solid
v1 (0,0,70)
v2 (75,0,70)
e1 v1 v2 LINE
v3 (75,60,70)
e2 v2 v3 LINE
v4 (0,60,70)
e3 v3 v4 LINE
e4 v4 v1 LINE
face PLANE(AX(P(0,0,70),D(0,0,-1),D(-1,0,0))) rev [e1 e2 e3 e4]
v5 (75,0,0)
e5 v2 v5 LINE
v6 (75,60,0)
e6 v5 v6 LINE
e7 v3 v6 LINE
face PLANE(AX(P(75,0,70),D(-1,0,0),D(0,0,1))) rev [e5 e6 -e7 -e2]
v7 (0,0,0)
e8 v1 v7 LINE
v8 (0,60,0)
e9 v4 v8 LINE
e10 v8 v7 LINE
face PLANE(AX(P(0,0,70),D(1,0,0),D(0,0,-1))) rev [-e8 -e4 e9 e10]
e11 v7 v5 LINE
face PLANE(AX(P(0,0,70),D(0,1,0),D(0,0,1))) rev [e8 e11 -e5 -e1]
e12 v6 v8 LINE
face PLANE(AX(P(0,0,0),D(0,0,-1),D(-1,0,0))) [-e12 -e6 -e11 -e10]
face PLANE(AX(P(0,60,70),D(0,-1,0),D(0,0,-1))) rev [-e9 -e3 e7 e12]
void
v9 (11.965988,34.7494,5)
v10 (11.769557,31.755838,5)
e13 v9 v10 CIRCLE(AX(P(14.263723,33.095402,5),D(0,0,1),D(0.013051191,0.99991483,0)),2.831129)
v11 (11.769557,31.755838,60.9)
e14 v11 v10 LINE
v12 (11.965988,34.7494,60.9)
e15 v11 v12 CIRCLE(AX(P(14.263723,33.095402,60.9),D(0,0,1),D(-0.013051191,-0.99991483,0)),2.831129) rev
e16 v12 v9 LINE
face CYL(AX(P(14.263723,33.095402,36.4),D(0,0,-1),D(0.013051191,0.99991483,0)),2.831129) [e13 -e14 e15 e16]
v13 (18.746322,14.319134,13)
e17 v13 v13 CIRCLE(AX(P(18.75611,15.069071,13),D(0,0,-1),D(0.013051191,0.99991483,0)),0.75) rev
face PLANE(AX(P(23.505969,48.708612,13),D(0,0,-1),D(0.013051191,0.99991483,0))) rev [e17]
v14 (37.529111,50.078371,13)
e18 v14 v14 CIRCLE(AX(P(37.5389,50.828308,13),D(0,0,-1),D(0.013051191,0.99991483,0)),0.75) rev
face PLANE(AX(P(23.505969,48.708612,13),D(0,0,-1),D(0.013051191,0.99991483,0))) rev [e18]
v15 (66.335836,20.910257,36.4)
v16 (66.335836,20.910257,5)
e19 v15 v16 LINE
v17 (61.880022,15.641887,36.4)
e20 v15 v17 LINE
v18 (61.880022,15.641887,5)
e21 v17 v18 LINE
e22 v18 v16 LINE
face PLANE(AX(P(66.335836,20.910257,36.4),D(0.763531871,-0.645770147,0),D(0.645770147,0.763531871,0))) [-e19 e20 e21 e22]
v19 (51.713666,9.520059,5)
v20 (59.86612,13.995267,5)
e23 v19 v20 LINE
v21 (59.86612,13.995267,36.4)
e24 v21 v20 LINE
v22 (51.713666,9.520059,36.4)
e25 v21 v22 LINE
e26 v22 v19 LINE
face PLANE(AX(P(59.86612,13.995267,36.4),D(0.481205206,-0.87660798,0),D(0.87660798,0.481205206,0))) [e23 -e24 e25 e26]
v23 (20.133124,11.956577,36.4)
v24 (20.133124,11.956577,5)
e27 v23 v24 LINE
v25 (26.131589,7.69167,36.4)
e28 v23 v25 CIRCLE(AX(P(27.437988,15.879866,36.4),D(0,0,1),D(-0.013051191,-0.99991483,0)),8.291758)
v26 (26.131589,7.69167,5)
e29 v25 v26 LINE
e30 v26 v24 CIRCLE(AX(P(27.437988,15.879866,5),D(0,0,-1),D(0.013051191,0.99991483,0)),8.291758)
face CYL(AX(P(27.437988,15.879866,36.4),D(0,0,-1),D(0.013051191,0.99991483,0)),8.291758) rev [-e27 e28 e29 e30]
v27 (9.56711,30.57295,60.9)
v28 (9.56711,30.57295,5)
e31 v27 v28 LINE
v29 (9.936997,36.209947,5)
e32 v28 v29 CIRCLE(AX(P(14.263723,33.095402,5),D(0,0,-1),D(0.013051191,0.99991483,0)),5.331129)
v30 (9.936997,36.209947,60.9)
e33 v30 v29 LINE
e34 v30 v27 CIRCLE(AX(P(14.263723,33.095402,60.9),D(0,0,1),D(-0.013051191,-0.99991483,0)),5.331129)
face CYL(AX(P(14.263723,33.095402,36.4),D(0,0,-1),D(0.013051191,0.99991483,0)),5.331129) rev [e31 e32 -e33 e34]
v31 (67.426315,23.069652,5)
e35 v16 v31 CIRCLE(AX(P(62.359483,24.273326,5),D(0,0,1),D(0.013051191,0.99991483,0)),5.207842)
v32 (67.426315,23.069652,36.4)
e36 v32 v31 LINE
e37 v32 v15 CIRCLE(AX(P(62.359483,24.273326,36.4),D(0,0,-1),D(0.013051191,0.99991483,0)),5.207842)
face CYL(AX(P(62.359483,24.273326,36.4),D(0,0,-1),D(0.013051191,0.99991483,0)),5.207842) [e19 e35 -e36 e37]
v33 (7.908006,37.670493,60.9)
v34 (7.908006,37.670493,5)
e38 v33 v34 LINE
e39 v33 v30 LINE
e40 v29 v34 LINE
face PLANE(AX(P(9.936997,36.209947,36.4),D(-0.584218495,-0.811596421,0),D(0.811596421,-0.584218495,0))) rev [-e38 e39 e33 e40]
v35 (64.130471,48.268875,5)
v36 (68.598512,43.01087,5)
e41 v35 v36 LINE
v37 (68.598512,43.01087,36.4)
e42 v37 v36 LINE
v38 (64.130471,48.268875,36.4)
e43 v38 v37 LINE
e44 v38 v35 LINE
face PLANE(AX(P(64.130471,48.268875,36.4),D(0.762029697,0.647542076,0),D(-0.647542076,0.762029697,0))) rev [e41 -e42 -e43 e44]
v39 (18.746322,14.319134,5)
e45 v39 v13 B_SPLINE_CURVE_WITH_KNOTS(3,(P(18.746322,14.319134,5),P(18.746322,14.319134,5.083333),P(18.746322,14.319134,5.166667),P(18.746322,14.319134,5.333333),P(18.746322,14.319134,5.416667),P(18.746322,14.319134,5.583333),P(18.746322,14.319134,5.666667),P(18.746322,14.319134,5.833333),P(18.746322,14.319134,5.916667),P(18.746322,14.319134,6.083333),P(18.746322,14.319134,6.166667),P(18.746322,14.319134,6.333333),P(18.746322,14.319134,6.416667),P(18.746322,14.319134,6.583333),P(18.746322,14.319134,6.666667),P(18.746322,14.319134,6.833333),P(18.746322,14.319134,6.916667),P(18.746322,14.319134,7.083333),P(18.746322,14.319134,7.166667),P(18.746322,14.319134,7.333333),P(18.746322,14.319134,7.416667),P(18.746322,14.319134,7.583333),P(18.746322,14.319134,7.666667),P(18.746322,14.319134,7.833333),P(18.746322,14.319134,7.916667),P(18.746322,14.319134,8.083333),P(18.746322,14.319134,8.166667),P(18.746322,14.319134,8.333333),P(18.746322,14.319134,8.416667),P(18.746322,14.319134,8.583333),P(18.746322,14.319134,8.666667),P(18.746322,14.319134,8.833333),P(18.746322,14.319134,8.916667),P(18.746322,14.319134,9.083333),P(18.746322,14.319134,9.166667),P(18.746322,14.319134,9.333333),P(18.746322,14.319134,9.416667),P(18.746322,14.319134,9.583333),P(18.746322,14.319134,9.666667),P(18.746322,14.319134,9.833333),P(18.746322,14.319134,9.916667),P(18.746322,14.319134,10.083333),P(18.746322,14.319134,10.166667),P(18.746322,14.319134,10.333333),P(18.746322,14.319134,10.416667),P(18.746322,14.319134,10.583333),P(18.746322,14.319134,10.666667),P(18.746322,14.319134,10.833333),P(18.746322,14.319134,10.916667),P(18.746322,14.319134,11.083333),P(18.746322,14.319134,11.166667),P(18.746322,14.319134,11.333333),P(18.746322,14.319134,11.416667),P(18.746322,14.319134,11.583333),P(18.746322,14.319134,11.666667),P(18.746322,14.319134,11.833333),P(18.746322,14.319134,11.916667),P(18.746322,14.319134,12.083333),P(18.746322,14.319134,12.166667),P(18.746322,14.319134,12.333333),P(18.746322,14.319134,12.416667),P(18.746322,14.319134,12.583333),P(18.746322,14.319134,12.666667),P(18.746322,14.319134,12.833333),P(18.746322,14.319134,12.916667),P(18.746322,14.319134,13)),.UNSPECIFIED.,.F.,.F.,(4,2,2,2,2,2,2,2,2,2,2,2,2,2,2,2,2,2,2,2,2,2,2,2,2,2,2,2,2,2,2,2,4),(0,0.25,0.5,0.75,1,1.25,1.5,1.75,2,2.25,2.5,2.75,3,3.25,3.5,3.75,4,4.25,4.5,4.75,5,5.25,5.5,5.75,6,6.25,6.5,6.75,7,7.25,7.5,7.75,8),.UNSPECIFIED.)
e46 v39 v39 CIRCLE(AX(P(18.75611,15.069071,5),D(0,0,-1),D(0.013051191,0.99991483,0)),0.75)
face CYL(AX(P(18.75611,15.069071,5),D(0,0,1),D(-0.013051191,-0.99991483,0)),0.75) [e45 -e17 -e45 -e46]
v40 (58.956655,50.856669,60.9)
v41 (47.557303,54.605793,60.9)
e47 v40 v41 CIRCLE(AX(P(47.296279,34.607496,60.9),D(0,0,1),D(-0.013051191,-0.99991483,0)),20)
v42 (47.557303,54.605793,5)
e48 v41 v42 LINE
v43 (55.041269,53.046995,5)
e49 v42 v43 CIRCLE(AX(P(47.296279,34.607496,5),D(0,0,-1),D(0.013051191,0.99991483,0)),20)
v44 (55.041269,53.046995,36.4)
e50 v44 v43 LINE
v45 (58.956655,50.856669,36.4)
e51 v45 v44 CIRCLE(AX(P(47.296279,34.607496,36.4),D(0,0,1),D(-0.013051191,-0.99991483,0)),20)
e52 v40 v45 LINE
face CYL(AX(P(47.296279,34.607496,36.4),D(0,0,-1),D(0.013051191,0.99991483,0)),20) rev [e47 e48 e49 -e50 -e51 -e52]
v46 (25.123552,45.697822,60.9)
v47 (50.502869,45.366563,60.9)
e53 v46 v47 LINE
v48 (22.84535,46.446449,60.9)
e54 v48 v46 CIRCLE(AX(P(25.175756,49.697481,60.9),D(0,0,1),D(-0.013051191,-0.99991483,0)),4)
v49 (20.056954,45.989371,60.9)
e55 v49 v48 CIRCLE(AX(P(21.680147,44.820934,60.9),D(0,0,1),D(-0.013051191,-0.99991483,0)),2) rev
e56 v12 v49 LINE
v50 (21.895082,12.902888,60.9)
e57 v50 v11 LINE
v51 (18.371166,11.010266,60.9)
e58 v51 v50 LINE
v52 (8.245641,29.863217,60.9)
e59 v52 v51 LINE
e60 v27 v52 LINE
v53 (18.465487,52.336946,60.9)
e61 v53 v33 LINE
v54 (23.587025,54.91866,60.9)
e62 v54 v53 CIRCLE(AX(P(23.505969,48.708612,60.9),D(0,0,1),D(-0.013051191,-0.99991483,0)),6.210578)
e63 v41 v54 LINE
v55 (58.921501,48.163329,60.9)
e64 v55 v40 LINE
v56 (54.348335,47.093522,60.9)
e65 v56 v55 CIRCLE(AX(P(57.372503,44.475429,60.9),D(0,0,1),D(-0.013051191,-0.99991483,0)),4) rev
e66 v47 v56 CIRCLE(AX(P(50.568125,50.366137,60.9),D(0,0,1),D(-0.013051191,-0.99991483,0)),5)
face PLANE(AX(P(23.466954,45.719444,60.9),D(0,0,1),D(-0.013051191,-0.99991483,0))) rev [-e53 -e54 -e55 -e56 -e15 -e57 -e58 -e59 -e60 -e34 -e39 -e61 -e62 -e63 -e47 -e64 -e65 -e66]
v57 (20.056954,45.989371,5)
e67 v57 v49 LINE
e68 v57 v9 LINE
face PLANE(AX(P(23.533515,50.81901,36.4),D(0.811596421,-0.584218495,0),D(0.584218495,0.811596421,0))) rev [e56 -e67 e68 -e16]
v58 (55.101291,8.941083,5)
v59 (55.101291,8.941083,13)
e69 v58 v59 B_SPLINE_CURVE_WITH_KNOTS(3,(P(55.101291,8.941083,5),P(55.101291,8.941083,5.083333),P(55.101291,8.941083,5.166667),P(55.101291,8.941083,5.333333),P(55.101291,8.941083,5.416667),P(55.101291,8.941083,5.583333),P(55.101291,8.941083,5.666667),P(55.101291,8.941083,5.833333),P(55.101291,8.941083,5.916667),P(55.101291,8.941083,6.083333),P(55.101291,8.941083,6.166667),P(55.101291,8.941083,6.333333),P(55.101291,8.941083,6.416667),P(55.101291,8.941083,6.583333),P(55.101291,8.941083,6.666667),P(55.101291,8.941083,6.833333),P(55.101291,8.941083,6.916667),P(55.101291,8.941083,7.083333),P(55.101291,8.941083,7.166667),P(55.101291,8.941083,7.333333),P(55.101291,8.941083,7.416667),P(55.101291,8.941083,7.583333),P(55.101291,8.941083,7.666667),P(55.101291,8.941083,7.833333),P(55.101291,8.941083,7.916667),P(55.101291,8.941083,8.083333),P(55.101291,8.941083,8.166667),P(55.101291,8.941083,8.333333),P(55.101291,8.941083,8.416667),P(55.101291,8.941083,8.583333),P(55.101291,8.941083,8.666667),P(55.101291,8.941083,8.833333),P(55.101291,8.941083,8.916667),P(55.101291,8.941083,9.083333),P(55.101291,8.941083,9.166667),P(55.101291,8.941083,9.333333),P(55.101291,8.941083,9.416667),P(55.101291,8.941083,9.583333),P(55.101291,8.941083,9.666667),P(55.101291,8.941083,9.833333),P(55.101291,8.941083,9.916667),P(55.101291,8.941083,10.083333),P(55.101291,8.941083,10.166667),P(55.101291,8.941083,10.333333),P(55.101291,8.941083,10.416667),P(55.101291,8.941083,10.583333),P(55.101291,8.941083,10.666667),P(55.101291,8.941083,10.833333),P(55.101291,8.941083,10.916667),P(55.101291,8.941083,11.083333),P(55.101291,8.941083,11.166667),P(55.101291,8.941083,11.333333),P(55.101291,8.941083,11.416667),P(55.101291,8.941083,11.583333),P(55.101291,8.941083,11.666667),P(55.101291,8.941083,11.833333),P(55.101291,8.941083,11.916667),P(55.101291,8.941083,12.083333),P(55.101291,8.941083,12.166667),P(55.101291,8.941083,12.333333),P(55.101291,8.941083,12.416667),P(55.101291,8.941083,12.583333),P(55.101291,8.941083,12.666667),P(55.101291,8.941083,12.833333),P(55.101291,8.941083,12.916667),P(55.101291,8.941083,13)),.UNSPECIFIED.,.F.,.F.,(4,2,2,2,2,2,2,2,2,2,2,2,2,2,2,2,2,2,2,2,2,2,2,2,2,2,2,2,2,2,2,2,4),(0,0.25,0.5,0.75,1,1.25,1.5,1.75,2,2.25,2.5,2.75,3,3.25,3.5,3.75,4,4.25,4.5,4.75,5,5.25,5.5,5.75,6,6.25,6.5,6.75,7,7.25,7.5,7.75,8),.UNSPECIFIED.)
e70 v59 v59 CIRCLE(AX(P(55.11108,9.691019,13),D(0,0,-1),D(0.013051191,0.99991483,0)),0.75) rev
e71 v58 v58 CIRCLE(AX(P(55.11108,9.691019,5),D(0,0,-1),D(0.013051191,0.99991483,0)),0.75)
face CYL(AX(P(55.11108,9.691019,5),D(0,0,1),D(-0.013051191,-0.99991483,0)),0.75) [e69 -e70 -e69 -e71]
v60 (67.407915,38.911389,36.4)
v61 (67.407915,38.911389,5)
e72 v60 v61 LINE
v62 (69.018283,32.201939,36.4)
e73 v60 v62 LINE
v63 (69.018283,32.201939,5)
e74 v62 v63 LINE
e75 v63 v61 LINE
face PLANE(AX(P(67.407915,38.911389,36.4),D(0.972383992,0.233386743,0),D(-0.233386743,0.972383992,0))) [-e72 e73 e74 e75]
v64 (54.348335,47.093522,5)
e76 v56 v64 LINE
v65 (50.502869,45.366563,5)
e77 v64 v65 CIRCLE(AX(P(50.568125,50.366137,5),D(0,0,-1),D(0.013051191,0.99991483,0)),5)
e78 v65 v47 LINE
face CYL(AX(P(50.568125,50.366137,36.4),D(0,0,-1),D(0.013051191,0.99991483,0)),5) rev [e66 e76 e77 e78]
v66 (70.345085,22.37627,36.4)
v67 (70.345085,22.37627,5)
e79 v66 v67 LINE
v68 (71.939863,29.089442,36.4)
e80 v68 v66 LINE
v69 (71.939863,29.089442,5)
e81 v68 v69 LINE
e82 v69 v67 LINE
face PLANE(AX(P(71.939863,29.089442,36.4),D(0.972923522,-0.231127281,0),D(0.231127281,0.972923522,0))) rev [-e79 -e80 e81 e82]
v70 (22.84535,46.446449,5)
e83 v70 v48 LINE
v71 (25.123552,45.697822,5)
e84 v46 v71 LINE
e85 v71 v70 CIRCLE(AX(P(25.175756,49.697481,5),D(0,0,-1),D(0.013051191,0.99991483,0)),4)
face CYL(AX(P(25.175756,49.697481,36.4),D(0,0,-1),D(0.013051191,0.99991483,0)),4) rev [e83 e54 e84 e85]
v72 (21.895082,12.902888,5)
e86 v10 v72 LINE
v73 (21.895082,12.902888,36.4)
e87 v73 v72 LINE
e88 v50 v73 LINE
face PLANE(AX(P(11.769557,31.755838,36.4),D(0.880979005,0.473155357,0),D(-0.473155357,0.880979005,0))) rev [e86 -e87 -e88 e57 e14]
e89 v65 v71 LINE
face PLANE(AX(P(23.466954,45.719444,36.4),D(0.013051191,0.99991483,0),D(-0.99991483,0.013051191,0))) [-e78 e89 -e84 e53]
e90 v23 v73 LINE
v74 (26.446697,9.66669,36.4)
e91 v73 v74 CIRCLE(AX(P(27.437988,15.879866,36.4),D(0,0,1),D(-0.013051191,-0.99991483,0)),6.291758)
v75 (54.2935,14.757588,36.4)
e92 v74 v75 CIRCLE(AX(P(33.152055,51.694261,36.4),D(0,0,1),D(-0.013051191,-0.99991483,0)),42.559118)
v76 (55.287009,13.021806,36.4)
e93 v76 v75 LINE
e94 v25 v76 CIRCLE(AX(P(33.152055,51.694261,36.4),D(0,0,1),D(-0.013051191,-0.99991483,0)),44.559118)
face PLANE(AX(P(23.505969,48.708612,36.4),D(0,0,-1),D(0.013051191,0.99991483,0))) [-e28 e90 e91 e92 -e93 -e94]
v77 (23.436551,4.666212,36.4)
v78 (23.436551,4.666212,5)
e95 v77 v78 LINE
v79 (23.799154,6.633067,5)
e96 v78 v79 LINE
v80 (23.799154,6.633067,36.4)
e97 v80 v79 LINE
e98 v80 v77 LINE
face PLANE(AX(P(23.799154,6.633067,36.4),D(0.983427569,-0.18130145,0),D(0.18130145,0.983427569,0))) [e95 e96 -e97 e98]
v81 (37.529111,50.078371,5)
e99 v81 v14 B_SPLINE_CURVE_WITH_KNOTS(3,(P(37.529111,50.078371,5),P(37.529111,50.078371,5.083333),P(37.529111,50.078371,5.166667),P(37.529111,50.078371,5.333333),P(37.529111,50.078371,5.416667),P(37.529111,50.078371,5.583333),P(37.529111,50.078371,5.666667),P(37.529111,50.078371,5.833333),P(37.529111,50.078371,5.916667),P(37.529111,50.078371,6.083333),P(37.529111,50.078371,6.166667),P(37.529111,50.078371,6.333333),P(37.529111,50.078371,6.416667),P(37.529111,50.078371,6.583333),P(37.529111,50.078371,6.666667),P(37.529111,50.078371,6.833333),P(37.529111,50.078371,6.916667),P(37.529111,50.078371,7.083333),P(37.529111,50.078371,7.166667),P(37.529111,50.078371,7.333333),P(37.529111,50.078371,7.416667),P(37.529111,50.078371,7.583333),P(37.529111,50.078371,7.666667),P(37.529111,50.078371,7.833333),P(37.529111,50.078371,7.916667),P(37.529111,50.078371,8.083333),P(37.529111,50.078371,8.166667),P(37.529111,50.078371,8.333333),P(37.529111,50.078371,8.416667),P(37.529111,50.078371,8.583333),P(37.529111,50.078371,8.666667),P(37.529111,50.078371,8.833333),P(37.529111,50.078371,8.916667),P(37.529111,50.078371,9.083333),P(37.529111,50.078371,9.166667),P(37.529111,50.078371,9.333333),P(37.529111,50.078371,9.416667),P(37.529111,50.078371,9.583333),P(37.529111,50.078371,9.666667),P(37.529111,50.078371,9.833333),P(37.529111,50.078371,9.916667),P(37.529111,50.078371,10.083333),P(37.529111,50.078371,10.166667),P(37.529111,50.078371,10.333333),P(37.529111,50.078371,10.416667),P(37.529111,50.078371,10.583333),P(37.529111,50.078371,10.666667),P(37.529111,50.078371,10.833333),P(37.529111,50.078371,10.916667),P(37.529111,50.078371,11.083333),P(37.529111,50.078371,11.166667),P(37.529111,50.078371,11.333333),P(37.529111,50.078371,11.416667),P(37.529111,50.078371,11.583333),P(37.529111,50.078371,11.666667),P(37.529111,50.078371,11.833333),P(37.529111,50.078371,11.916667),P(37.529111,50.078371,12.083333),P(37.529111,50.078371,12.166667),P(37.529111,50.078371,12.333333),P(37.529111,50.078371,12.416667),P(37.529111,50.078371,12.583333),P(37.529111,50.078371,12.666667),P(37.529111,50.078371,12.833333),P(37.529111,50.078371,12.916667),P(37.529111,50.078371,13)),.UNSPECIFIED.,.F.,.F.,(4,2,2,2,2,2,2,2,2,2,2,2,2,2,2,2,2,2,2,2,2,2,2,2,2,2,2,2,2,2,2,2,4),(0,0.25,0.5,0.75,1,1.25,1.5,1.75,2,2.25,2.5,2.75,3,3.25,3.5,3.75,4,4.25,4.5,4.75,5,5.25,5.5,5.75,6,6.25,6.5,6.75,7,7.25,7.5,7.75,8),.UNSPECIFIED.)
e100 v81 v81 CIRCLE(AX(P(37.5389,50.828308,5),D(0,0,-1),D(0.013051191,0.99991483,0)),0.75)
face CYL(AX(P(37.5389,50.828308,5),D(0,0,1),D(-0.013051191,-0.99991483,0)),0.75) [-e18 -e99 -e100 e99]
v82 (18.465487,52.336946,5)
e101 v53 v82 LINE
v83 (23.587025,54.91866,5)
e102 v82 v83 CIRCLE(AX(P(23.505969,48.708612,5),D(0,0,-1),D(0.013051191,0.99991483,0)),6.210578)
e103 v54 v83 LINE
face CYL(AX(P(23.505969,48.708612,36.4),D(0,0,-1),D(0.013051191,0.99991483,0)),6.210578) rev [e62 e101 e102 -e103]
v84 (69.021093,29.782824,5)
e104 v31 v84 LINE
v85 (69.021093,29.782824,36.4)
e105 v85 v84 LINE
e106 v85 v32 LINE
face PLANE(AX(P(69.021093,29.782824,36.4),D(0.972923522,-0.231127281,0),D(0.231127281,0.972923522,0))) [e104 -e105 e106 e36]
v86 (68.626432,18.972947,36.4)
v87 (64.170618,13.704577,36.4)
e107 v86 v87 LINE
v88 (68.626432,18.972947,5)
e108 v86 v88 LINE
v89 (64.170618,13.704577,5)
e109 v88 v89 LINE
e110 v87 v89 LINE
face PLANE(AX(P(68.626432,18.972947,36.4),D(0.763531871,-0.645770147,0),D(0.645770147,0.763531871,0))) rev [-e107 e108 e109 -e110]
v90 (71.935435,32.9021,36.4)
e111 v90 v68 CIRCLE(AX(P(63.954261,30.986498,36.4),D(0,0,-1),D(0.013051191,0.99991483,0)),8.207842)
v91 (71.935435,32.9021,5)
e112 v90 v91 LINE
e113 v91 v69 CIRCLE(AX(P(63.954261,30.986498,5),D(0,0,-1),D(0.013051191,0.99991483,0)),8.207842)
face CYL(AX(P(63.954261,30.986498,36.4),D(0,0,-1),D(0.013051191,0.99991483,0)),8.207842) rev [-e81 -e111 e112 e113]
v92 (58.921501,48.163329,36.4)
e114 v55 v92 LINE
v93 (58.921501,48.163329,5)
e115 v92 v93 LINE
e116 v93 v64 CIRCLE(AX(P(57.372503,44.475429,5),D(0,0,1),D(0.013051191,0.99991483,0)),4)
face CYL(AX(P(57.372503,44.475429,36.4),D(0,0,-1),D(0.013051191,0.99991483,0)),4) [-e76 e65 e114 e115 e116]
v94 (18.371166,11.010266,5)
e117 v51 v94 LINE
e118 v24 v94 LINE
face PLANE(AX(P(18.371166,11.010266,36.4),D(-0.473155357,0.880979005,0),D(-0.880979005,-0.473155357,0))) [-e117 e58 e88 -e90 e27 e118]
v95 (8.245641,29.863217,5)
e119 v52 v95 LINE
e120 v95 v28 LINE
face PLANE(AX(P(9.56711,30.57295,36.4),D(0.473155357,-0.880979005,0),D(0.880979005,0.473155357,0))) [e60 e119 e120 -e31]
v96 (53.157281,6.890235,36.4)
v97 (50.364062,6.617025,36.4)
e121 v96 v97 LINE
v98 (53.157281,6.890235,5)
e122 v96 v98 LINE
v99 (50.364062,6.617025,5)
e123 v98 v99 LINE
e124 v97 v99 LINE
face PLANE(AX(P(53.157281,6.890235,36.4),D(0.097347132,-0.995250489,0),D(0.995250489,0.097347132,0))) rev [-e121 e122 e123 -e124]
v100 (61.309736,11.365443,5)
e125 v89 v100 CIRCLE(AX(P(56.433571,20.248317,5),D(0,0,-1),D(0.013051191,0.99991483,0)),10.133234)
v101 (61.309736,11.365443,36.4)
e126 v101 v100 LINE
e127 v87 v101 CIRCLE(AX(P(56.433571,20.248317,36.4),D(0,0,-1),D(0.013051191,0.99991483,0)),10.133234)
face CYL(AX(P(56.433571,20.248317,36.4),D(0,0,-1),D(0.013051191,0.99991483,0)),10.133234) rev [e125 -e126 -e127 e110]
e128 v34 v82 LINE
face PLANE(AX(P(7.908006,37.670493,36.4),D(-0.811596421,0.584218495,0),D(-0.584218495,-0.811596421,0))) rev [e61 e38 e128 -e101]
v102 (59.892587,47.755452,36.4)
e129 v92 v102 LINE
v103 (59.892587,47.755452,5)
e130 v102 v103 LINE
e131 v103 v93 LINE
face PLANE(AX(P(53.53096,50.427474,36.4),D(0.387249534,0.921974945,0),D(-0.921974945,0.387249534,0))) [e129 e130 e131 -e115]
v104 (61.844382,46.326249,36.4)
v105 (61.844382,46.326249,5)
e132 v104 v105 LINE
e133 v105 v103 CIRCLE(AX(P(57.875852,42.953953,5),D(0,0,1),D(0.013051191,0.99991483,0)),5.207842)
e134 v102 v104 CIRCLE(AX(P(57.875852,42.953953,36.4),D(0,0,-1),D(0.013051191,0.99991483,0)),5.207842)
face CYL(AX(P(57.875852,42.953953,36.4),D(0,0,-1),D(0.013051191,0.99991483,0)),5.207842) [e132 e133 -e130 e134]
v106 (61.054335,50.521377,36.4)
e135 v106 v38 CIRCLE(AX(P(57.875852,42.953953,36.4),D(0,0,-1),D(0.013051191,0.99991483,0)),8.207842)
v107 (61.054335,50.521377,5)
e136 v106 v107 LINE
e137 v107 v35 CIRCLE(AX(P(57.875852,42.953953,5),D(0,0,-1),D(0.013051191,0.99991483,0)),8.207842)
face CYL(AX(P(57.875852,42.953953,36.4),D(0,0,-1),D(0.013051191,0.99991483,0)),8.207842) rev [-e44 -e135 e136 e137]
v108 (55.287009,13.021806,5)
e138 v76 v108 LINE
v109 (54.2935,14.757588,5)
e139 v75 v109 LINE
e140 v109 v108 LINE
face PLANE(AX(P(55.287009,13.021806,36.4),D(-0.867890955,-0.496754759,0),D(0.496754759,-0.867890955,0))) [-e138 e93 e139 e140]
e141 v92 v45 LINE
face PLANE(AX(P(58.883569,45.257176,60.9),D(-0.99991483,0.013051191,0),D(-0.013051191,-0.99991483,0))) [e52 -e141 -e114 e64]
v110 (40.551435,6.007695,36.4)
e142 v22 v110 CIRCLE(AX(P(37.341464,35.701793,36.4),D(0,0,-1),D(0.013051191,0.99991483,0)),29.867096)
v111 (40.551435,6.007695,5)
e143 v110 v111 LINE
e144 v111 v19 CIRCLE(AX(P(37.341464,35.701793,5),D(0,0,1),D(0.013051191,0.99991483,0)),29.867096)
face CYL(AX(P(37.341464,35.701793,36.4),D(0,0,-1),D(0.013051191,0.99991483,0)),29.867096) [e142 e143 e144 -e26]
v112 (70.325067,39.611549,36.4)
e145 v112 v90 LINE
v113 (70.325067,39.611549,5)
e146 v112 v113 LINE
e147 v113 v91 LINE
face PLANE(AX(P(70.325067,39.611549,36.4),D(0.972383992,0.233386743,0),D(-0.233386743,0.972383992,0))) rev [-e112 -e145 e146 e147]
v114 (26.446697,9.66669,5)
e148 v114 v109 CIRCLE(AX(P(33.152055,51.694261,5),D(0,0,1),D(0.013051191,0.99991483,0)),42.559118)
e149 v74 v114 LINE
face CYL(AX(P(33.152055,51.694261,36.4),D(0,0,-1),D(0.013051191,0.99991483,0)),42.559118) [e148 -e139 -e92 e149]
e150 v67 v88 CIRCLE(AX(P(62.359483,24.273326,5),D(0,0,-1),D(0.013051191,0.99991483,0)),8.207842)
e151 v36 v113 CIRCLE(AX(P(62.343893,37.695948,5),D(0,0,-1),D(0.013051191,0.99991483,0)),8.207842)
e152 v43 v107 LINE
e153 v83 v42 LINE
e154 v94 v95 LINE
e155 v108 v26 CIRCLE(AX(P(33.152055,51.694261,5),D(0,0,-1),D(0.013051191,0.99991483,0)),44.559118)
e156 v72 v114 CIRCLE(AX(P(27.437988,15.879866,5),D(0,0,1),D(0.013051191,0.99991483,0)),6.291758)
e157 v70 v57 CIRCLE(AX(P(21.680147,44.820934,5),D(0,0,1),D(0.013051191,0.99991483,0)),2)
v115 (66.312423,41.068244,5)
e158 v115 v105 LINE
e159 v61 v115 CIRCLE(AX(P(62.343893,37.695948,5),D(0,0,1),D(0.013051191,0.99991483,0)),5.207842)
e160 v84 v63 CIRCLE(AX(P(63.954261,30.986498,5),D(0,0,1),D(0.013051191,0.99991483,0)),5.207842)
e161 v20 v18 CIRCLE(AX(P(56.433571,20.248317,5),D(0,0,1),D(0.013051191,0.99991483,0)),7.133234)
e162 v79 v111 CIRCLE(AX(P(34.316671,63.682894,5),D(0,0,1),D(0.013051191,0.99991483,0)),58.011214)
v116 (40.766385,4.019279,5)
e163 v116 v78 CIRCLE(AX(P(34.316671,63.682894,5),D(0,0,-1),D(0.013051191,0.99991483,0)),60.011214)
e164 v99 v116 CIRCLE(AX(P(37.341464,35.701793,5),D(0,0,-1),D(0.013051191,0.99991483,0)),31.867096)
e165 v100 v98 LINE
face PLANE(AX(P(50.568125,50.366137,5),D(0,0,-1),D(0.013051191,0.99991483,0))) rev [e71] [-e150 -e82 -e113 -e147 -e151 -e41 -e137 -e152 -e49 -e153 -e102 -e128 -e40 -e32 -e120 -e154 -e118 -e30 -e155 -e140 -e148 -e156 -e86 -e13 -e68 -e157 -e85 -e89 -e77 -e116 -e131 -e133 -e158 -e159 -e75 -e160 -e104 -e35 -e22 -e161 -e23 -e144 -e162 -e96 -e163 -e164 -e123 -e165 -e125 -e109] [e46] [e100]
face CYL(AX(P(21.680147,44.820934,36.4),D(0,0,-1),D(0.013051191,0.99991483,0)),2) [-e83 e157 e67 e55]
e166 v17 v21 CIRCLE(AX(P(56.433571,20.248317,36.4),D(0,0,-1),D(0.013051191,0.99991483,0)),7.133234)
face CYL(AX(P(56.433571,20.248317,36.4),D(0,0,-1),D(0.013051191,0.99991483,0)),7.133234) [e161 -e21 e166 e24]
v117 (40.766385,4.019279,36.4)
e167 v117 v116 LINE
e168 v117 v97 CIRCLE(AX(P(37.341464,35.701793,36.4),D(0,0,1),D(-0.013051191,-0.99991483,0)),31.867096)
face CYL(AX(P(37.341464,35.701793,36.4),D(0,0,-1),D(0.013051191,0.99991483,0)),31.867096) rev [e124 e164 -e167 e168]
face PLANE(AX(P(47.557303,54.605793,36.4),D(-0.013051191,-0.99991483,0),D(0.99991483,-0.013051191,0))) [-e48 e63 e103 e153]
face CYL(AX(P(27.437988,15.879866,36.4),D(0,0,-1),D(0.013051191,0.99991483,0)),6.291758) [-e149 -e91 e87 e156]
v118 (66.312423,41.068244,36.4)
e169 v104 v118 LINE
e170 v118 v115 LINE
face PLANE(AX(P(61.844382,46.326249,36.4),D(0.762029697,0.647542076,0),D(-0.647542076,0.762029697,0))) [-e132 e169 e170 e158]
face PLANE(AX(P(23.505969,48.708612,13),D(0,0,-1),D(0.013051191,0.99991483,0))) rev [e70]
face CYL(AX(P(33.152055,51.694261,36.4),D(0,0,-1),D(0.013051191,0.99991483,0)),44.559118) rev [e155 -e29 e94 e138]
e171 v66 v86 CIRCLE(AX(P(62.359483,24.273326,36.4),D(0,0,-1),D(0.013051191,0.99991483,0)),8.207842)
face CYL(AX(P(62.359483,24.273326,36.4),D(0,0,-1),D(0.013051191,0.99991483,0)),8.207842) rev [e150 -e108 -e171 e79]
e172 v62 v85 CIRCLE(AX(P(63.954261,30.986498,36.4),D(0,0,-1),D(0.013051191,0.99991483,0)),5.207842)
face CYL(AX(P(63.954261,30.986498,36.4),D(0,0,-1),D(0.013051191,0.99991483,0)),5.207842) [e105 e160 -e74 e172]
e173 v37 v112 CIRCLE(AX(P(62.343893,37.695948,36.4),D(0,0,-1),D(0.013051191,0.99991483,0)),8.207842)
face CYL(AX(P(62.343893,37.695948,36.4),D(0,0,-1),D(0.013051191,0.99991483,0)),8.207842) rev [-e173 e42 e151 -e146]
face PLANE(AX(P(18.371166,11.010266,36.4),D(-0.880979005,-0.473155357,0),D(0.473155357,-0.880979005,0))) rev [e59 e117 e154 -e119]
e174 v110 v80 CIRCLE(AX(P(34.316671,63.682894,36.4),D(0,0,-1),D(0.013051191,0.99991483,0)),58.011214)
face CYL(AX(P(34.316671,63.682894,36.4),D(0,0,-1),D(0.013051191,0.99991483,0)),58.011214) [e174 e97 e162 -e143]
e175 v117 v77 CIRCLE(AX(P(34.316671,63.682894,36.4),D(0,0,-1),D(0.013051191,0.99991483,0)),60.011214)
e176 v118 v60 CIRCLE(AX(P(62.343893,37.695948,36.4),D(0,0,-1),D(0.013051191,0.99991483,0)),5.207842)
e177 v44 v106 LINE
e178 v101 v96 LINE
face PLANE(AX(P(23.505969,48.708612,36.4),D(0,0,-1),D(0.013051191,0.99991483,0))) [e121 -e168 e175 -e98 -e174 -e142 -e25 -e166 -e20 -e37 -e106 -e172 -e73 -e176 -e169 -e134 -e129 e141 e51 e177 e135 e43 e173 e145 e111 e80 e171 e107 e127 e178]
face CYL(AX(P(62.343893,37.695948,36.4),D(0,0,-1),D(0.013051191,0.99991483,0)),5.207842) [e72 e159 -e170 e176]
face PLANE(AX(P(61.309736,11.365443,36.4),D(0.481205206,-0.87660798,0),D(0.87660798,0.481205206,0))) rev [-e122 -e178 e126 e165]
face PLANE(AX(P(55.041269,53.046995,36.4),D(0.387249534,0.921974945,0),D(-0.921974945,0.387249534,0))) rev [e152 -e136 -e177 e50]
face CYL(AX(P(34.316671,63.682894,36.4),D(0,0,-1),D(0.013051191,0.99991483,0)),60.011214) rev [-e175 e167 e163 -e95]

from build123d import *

# Parameters (mm, degrees)
SKETCH1_W           = 75
SKETCH1_H           = 60
BOSS_EXTRUDE1_DEPTH = 70
CAVITY1_START       = 5
CAVITY1_OUTLINE_R   = 0.75
CAVITY1_DEPTH       = 55.9
CAVITY1_2_OUTLINE_R = 0.75
CAVITY1_2_DEPTH     = 31.4
CAVITY1_START_2     = 13
CAVITY1_3_OUTLINE_R = 0.75
CAVITY1_3_DEPTH     = 47.9
CAVITY1_4_OUTLINE_R = 0.75
CAVITY1_4_DEPTH     = 23.4


# Read off the part's stored shape, not the designer's step: Cavity1
with BuildPart() as part:
    # Sketch1 → Boss-Extrude1 (new body)
    with BuildSketch(Plane.XY):
        with Locations((37.5, 30)):
            Rectangle(SKETCH1_W, SKETCH1_H)
    extrude(amount=BOSS_EXTRUDE1_DEPTH)

    # Cavity1 outline → Cavity1 (cut)
    with BuildSketch(Plane.XY.offset(CAVITY1_START)):
        with BuildLine():
            Line((18.46548662, 52.336946082), (7.908006381, 37.670492946))
            Line((7.908006381, 37.670492946), (9.936997433, 36.209946709))
            ThreePointArc((9.936997433, 36.209946709), (8.94403376, 33.444468797), (9.567109894, 30.572949848))
            Line((9.567109894, 30.572949848), (8.245641386, 29.863216812))
            Line((8.245641386, 29.863216812), (18.37116603, 11.010266096))
            Line((18.37116603, 11.010266096), (21.895082052, 12.902887525))
            Line((21.895082052, 12.902887525), (11.769557408, 31.755838241))
            ThreePointArc((11.769557408, 31.755838241), (11.438668953, 33.280776232), (11.965988485, 34.749400472))
            Line((11.965988485, 34.749400472), (20.056953769, 45.989370661))
            ThreePointArc((20.056953769, 45.989370661), (21.356620935, 46.794592998), (22.845349854, 46.446449406))
            ThreePointArc((22.845349854, 46.446449406), (23.927028985, 45.897391402), (25.123551575, 45.697821555))
            Line((25.123551575, 45.697821555), (50.502868756, 45.366563013))
            ThreePointArc((50.502868756, 45.366563013), (52.616494227, 45.804976964), (54.348334803, 47.093521742))
            ThreePointArc((54.348334803, 47.093521742), (56.461375235, 48.37027811), (58.92150101, 48.163329184))
            Line((58.92150101, 48.163329184), (58.956655303, 50.856669359))
            ThreePointArc((58.956655303, 50.856669359), (53.544792902, 53.606340424), (47.557302608, 54.60579307))
            Line((47.557302608, 54.60579307), (23.587024567, 54.918660406))
            ThreePointArc((23.587024567, 54.918660406), (20.710384856, 54.254419425), (18.46548662, 52.336946082))
        make_face()
        with Locations((18.756110409, 15.069070512)):
            Circle(CAVITY1_OUTLINE_R, mode=Mode.SUBTRACT)
        with Locations((37.538899797, 50.828307501)):
            Circle(CAVITY1_OUTLINE_R, mode=Mode.SUBTRACT)
    extrude(amount=CAVITY1_DEPTH, mode=Mode.SUBTRACT)

    # Cavity1 2 outline → Cavity1 2 (cut)
    # profile 1 of 2: a face of its own
    with BuildSketch(Plane.XY.offset(CAVITY1_START)):
        with BuildLine():
            Line((61.054335289, 50.521376908), (55.041269461, 53.046995369))
            ThreePointArc((55.041269461, 53.046995369), (57.060573485, 52.061967221), (58.956655303, 50.856669359))
            Line((58.956655303, 50.856669359), (58.92150101, 48.163329184))
            Line((58.92150101, 48.163329184), (59.892586686, 47.755452074))
            ThreePointArc((59.892586686, 47.755452074), (60.952620575, 47.155751273), (61.844382404, 46.326249172))
            Line((61.844382404, 46.326249172), (66.312422732, 41.068244262))
            ThreePointArc((66.312422732, 41.068244262), (66.987141001, 40.054307304), (67.407914577, 38.911388893))
            Line((67.407914577, 38.911388893), (69.018283104, 32.201939348))
            ThreePointArc((69.018283104, 32.201939348), (69.162099385, 30.992547032), (69.021092891, 29.782823896))
            Line((69.021092891, 29.782823896), (67.426314651, 23.069651593))
            ThreePointArc((67.426314651, 23.069651593), (67.008197192, 21.925758816), (66.335836102, 20.910257235))
            Line((66.335836102, 20.910257235), (61.88002209, 15.641887326))
            ThreePointArc((61.88002209, 15.641887326), (60.948767594, 14.725996436), (59.86612003, 13.995267134))
            Line((59.86612003, 13.995267134), (51.713665819, 9.520058721))
            ThreePointArc((51.713665819, 9.520058721), (46.306249088, 7.211864539), (40.551434527, 6.007694509))
            ThreePointArc((40.551434527, 6.007694509), (32.152585039, 5.712059517), (23.799153538, 6.633067087))
            Line((23.799153538, 6.633067087), (23.436550639, 4.666211949))
            ThreePointArc((23.436550639, 4.666211949), (32.077975822, 3.713451636), (40.766384828, 4.019278967))
            ThreePointArc((40.766384828, 4.019278967), (45.667164707, 4.941518532), (50.36406223, 6.617025293))
            Line((50.36406223, 6.617025293), (53.157281436, 6.890234782))
            Line((53.157281436, 6.890234782), (61.309735647, 11.365443195))
            ThreePointArc((61.309735647, 11.365443195), (62.847708644, 12.403492855), (64.170617702, 13.704576886))
            Line((64.170617702, 13.704576886), (68.626431714, 18.972946795))
            ThreePointArc((68.626431714, 18.972946795), (69.686109361, 20.573432518), (70.345085218, 22.37626975))
            Line((70.345085218, 22.37626975), (71.939863457, 29.089442053))
            ThreePointArc((71.939863457, 29.089442053), (72.162097362, 30.99603151), (71.93543508, 32.902099577))
            Line((71.93543508, 32.902099577), (70.325066554, 39.611549122))
            ThreePointArc((70.325066554, 39.611549122), (69.661904513, 41.4128507), (68.598511823, 43.010870491))
            Line((68.598511823, 43.010870491), (64.130471496, 48.268875401))
            ThreePointArc((64.130471496, 48.268875401), (62.725006351, 49.576215828), (61.054335289, 50.521376908))
        make_face()
        with Locations((55.111079675, 9.691018641)):
            Circle(CAVITY1_2_OUTLINE_R, mode=Mode.SUBTRACT)
    # profile 2 of 2: a face of its own
    with BuildSketch(Plane.XY.offset(CAVITY1_START)):
        with BuildLine():
            Line((21.895082052, 12.902887525), (20.133124041, 11.956576811))
            ThreePointArc((20.133124041, 11.956576811), (22.633217451, 9.122098941), (26.13158906, 7.691669655))
            ThreePointArc((26.13158906, 7.691669655), (41.165451618, 7.861619441), (55.287009069, 13.021805628))
            Line((55.287009069, 13.021805628), (54.29349955, 14.757587538))
            ThreePointArc((54.29349955, 14.757587538), (40.805776793, 9.829012137), (26.446697007, 9.66669041))
            ThreePointArc((26.446697007, 9.66669041), (23.79214447, 10.752095311), (21.895082052, 12.902887525))
        make_face()
    extrude(amount=CAVITY1_2_DEPTH, mode=Mode.SUBTRACT)

    # Cavity1 3 outline → Cavity1 3 (cut)
    with BuildSketch(Plane.XY.offset(CAVITY1_START_2)):
        with Locations((18.756110409, 15.069070512)):
            Circle(CAVITY1_3_OUTLINE_R)
        with Locations((37.538899797, 50.828307501)):
            Circle(CAVITY1_3_OUTLINE_R)
    extrude(amount=CAVITY1_3_DEPTH, mode=Mode.SUBTRACT)

    # Cavity1 4 outline → Cavity1 4 (cut)
    with BuildSketch(Plane.XY.offset(CAVITY1_START_2)):
        with Locations((55.111079675, 9.691018641)):
            Circle(CAVITY1_4_OUTLINE_R)
    extrude(amount=CAVITY1_4_DEPTH, mode=Mode.SUBTRACT)


solid = part.part
